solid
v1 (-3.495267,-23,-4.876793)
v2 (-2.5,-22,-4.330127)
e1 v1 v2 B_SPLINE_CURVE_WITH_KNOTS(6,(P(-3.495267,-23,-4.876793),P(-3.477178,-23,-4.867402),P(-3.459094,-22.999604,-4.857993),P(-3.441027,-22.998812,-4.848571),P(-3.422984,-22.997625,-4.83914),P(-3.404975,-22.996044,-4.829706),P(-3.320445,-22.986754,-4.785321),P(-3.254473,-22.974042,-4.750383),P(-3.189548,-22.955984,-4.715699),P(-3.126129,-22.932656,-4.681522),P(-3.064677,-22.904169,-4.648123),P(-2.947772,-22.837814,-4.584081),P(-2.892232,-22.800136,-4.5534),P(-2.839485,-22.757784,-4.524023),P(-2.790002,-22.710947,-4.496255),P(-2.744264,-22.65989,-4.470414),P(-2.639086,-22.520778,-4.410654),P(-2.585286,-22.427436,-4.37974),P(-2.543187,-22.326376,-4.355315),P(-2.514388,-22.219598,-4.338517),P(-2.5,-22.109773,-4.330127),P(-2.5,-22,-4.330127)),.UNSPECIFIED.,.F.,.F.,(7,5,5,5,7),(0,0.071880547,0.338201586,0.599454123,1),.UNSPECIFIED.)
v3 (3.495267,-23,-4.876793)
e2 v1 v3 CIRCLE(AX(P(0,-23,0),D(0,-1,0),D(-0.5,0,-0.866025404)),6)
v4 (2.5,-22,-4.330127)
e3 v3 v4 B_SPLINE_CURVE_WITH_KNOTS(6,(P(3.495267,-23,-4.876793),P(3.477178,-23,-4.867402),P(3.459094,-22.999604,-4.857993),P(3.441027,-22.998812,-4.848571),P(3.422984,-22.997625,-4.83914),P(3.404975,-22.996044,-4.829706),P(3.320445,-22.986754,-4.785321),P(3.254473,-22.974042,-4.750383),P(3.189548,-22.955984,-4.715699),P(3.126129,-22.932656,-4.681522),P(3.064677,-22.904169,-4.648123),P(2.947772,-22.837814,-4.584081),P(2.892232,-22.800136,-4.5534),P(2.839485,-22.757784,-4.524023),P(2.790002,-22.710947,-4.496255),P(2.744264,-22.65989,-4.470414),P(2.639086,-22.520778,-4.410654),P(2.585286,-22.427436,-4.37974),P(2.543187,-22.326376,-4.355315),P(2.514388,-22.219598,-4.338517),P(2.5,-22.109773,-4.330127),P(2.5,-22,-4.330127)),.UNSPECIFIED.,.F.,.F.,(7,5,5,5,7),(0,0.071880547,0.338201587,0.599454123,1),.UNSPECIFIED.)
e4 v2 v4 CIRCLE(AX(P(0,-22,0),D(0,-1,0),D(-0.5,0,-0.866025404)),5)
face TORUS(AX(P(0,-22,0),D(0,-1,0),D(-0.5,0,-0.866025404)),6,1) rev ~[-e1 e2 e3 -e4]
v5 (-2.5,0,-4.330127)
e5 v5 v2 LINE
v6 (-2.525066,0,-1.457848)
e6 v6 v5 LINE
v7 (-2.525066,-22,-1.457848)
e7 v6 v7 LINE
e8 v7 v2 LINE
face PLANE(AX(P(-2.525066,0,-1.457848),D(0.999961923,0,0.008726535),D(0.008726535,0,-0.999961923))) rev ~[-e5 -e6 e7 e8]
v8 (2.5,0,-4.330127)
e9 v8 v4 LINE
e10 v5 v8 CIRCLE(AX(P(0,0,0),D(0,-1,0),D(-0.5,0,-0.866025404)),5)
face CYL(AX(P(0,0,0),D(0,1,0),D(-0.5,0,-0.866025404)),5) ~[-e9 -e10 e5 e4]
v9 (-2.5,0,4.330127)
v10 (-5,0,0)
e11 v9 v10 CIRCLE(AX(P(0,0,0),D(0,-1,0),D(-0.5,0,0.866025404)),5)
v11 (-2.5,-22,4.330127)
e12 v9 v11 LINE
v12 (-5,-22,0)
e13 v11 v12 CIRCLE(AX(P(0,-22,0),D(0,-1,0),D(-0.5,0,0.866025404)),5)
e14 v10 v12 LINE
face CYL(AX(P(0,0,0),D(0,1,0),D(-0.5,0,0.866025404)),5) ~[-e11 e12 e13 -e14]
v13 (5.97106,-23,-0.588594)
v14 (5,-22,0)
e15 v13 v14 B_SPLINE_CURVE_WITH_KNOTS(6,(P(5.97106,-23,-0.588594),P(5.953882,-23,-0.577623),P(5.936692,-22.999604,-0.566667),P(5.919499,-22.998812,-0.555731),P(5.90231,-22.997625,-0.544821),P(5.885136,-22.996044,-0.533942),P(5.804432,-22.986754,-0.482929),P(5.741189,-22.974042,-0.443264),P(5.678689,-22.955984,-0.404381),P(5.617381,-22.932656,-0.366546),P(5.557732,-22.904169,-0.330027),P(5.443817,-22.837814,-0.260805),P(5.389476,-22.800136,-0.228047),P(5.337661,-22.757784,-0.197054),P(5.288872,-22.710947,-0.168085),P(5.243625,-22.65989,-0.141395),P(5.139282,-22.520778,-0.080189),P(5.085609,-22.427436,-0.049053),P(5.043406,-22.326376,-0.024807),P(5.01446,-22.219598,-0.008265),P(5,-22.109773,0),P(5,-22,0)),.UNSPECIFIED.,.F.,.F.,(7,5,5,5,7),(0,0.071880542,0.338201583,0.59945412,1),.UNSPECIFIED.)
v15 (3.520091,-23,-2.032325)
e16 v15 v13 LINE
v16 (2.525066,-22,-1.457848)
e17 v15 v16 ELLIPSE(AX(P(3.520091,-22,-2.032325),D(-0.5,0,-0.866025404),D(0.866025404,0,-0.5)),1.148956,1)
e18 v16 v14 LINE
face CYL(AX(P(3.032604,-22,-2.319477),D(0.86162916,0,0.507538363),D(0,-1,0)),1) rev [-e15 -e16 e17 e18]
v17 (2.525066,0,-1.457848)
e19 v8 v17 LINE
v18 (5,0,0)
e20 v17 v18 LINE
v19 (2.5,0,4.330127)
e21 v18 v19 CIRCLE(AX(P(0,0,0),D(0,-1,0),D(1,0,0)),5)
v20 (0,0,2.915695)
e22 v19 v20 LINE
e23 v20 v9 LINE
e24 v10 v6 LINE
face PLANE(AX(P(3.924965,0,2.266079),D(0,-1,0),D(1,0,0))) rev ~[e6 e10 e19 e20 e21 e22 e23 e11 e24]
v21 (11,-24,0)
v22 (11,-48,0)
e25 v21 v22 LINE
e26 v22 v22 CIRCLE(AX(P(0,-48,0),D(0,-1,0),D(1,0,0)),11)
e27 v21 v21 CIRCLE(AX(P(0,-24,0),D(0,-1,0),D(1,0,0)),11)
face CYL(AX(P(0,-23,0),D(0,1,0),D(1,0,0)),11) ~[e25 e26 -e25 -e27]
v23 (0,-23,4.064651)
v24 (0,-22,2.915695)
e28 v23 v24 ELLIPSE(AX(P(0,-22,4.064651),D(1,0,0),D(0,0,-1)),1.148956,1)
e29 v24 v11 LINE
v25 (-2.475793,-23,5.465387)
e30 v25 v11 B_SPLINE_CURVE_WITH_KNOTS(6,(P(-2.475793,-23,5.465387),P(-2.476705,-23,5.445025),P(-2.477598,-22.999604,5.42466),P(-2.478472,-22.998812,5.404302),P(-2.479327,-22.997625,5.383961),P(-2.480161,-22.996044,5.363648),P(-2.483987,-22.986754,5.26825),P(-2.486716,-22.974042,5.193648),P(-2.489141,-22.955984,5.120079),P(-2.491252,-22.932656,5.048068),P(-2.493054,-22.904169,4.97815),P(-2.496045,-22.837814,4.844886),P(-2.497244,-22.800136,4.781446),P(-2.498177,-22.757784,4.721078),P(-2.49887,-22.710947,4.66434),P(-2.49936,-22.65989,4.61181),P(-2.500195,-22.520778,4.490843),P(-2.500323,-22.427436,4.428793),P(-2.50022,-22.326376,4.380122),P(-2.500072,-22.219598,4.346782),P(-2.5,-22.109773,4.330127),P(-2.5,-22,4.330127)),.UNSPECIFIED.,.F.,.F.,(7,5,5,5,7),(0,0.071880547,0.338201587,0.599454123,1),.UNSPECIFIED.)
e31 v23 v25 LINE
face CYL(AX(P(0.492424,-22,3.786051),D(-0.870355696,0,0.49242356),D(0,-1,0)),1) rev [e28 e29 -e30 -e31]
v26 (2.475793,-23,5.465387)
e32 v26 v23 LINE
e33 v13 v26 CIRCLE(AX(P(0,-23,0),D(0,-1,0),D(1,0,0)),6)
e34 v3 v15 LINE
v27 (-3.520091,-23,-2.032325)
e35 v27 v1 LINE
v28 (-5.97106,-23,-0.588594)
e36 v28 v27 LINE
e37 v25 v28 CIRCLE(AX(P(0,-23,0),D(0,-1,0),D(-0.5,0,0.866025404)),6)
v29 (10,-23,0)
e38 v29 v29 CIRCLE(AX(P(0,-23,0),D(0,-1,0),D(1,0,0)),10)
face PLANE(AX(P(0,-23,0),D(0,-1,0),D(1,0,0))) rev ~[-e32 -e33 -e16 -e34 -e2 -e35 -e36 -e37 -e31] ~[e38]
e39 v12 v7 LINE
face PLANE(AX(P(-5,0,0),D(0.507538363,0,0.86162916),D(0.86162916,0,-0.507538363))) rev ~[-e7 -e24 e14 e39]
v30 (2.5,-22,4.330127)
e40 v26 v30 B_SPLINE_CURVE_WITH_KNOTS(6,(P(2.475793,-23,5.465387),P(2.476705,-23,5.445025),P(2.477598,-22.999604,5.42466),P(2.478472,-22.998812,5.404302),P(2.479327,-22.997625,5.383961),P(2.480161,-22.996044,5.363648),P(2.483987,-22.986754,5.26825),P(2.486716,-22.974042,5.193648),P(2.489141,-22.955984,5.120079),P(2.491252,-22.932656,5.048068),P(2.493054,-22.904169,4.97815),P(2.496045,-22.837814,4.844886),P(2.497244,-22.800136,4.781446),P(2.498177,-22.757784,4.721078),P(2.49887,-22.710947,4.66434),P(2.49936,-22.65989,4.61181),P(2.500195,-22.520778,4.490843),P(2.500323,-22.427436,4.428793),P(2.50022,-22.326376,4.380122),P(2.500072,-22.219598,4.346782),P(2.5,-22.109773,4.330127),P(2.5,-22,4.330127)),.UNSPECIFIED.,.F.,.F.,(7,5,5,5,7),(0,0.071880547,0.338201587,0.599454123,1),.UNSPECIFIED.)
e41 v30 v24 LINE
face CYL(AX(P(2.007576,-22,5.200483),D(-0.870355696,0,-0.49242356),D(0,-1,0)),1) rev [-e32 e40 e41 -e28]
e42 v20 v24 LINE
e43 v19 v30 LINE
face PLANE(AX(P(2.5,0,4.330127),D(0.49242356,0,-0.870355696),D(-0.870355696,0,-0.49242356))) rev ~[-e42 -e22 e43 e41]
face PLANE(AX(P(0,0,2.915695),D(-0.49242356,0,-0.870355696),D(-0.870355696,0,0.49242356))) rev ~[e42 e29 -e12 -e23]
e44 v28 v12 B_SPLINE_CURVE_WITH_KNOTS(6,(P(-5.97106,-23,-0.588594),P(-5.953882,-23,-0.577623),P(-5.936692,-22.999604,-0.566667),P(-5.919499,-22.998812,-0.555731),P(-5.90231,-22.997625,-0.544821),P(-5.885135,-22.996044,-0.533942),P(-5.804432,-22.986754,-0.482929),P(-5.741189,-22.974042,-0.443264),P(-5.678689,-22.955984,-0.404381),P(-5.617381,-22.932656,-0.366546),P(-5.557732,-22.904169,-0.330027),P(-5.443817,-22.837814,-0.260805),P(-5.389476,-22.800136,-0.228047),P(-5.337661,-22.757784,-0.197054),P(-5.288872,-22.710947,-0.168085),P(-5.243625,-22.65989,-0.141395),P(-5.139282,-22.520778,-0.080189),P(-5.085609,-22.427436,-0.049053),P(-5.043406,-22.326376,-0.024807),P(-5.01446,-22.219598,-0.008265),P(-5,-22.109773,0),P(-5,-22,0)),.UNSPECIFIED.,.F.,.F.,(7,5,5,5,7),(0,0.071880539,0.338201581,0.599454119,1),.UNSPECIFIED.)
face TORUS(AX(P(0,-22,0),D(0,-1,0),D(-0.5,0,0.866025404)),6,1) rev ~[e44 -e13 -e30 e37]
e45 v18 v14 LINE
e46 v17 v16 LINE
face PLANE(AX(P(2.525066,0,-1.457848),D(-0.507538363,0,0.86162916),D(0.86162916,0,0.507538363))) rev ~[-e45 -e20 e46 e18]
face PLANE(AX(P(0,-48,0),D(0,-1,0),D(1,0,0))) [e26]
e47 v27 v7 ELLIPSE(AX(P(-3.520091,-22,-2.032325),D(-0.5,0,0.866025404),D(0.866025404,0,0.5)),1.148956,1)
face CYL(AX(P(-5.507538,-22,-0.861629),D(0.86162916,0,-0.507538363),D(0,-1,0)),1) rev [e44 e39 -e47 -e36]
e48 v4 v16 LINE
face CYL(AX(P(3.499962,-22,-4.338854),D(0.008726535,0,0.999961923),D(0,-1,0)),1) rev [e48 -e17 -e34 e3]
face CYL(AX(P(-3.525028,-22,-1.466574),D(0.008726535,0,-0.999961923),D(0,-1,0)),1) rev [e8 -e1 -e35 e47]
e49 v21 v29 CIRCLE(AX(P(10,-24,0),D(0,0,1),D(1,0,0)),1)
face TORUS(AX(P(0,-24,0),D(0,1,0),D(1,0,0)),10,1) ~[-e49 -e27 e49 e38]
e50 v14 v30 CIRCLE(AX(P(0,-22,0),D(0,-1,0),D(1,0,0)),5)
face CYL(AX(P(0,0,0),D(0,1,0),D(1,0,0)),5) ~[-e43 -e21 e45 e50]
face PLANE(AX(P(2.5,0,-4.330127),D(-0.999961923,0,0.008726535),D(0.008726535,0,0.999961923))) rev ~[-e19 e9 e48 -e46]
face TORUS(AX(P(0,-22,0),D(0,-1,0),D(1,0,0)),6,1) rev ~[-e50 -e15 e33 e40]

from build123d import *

# Parameters (mm, degrees)
F1_DEPTH = 23
F2_DEPTH = 23
F3_R     = 11
F4_DEPTH = 25
F5_R     = 1


with BuildPart() as f1:
    # F0 (on Front) → F1 (new body)
    with BuildSketch(Plane.XZ):
        Polygon((2.5250660033, -1.4578475367), (5, 0), (2.5, 4.3301270189), (0, 2.9156950735), (-2.5, 4.3301270189), (-5, 0), (-2.5250660033, -1.4578475367), (-2.5, -4.3301270189), (2.5, -4.3301270189), align=None)
    extrude(amount=F1_DEPTH)

    # F0 (on Front) → F2 (join, through all)
    with BuildSketch(Plane.XZ):
        with BuildLine():
            Line((2.5, 4.3301270189), (5, 0))
            ThreePointArc((5, 0), (4.3301270189, 2.5), (2.5, 4.3301270189))
        make_face()
        with BuildLine():
            Line((-5, 0), (-2.5, 4.3301270189))
            ThreePointArc((-2.5, 4.3301270189), (-4.3301270189, 2.5), (-5, 0))
        make_face()
        with BuildLine():
            ThreePointArc((-2.5, -4.3301270189), (0, -5), (2.5, -4.3301270189))
            Line((2.5, -4.3301270189), (-2.5, -4.3301270189))
        make_face()
    extrude(amount=F2_DEPTH)

    # F3 (on face) → F4 (join)
    with BuildSketch(Plane.XZ.offset(23)):
        Circle(F3_R)
        with BuildLine():
            Line((5, 0), (2.5250660033, -1.4578475367))
            Line((2.5250660033, -1.4578475367), (2.5, -4.3301270189))
            ThreePointArc((2.5, -4.3301270189), (0, -5), (-2.5, -4.3301270189))
            Line((-2.5, -4.3301270189), (-2.5250660033, -1.4578475367))
            Line((-2.5250660033, -1.4578475367), (-5, 0))
            ThreePointArc((-5, 0), (-4.3301270189, 2.5), (-2.5, 4.3301270189))
            Line((-2.5, 4.3301270189), (0, 2.9156950735))
            Line((0, 2.9156950735), (2.5, 4.3301270189))
            ThreePointArc((2.5, 4.3301270189), (4.3301270189, 2.5), (5, 0))
        make_face(mode=Mode.SUBTRACT)
        with BuildLine():
            Line((2.5, -4.3301270189), (2.5250660033, -1.4578475367))
            Line((2.5250660033, -1.4578475367), (5, 0))
            ThreePointArc((5, 0), (4.3301270189, 2.5), (2.5, 4.3301270189))
            Line((2.5, 4.3301270189), (0, 2.9156950735))
            Line((0, 2.9156950735), (-2.5, 4.3301270189))
            ThreePointArc((-2.5, 4.3301270189), (-4.3301270189, 2.5), (-5, 0))
            Line((-5, 0), (-2.5250660033, -1.4578475367))
            Line((-2.5250660033, -1.4578475367), (-2.5, -4.3301270189))
            ThreePointArc((-2.5, -4.3301270189), (0, -5), (2.5, -4.3301270189))
        make_face()
    extrude(amount=F4_DEPTH)

    # F5
    f5_edges = [f1.edges().sort_by_distance(p)[0] for p in [
        (-11, -23, 0),
        (3.762533, -23, -0.728924),
        (4.330127, -23, 2.5),
        (1.25, -23, 3.622911),
        (-1.25, -23, 3.622911),
        (-4.330127, -23, 2.5),
        (-3.762533, -23, -0.728924),
        (-2.512533, -23, -2.893987),
        (0, -23, -5),
        (2.512533, -23, -2.893987),
    ]]
    fillet(f5_edges, radius=F5_R)


solid = f1.part
